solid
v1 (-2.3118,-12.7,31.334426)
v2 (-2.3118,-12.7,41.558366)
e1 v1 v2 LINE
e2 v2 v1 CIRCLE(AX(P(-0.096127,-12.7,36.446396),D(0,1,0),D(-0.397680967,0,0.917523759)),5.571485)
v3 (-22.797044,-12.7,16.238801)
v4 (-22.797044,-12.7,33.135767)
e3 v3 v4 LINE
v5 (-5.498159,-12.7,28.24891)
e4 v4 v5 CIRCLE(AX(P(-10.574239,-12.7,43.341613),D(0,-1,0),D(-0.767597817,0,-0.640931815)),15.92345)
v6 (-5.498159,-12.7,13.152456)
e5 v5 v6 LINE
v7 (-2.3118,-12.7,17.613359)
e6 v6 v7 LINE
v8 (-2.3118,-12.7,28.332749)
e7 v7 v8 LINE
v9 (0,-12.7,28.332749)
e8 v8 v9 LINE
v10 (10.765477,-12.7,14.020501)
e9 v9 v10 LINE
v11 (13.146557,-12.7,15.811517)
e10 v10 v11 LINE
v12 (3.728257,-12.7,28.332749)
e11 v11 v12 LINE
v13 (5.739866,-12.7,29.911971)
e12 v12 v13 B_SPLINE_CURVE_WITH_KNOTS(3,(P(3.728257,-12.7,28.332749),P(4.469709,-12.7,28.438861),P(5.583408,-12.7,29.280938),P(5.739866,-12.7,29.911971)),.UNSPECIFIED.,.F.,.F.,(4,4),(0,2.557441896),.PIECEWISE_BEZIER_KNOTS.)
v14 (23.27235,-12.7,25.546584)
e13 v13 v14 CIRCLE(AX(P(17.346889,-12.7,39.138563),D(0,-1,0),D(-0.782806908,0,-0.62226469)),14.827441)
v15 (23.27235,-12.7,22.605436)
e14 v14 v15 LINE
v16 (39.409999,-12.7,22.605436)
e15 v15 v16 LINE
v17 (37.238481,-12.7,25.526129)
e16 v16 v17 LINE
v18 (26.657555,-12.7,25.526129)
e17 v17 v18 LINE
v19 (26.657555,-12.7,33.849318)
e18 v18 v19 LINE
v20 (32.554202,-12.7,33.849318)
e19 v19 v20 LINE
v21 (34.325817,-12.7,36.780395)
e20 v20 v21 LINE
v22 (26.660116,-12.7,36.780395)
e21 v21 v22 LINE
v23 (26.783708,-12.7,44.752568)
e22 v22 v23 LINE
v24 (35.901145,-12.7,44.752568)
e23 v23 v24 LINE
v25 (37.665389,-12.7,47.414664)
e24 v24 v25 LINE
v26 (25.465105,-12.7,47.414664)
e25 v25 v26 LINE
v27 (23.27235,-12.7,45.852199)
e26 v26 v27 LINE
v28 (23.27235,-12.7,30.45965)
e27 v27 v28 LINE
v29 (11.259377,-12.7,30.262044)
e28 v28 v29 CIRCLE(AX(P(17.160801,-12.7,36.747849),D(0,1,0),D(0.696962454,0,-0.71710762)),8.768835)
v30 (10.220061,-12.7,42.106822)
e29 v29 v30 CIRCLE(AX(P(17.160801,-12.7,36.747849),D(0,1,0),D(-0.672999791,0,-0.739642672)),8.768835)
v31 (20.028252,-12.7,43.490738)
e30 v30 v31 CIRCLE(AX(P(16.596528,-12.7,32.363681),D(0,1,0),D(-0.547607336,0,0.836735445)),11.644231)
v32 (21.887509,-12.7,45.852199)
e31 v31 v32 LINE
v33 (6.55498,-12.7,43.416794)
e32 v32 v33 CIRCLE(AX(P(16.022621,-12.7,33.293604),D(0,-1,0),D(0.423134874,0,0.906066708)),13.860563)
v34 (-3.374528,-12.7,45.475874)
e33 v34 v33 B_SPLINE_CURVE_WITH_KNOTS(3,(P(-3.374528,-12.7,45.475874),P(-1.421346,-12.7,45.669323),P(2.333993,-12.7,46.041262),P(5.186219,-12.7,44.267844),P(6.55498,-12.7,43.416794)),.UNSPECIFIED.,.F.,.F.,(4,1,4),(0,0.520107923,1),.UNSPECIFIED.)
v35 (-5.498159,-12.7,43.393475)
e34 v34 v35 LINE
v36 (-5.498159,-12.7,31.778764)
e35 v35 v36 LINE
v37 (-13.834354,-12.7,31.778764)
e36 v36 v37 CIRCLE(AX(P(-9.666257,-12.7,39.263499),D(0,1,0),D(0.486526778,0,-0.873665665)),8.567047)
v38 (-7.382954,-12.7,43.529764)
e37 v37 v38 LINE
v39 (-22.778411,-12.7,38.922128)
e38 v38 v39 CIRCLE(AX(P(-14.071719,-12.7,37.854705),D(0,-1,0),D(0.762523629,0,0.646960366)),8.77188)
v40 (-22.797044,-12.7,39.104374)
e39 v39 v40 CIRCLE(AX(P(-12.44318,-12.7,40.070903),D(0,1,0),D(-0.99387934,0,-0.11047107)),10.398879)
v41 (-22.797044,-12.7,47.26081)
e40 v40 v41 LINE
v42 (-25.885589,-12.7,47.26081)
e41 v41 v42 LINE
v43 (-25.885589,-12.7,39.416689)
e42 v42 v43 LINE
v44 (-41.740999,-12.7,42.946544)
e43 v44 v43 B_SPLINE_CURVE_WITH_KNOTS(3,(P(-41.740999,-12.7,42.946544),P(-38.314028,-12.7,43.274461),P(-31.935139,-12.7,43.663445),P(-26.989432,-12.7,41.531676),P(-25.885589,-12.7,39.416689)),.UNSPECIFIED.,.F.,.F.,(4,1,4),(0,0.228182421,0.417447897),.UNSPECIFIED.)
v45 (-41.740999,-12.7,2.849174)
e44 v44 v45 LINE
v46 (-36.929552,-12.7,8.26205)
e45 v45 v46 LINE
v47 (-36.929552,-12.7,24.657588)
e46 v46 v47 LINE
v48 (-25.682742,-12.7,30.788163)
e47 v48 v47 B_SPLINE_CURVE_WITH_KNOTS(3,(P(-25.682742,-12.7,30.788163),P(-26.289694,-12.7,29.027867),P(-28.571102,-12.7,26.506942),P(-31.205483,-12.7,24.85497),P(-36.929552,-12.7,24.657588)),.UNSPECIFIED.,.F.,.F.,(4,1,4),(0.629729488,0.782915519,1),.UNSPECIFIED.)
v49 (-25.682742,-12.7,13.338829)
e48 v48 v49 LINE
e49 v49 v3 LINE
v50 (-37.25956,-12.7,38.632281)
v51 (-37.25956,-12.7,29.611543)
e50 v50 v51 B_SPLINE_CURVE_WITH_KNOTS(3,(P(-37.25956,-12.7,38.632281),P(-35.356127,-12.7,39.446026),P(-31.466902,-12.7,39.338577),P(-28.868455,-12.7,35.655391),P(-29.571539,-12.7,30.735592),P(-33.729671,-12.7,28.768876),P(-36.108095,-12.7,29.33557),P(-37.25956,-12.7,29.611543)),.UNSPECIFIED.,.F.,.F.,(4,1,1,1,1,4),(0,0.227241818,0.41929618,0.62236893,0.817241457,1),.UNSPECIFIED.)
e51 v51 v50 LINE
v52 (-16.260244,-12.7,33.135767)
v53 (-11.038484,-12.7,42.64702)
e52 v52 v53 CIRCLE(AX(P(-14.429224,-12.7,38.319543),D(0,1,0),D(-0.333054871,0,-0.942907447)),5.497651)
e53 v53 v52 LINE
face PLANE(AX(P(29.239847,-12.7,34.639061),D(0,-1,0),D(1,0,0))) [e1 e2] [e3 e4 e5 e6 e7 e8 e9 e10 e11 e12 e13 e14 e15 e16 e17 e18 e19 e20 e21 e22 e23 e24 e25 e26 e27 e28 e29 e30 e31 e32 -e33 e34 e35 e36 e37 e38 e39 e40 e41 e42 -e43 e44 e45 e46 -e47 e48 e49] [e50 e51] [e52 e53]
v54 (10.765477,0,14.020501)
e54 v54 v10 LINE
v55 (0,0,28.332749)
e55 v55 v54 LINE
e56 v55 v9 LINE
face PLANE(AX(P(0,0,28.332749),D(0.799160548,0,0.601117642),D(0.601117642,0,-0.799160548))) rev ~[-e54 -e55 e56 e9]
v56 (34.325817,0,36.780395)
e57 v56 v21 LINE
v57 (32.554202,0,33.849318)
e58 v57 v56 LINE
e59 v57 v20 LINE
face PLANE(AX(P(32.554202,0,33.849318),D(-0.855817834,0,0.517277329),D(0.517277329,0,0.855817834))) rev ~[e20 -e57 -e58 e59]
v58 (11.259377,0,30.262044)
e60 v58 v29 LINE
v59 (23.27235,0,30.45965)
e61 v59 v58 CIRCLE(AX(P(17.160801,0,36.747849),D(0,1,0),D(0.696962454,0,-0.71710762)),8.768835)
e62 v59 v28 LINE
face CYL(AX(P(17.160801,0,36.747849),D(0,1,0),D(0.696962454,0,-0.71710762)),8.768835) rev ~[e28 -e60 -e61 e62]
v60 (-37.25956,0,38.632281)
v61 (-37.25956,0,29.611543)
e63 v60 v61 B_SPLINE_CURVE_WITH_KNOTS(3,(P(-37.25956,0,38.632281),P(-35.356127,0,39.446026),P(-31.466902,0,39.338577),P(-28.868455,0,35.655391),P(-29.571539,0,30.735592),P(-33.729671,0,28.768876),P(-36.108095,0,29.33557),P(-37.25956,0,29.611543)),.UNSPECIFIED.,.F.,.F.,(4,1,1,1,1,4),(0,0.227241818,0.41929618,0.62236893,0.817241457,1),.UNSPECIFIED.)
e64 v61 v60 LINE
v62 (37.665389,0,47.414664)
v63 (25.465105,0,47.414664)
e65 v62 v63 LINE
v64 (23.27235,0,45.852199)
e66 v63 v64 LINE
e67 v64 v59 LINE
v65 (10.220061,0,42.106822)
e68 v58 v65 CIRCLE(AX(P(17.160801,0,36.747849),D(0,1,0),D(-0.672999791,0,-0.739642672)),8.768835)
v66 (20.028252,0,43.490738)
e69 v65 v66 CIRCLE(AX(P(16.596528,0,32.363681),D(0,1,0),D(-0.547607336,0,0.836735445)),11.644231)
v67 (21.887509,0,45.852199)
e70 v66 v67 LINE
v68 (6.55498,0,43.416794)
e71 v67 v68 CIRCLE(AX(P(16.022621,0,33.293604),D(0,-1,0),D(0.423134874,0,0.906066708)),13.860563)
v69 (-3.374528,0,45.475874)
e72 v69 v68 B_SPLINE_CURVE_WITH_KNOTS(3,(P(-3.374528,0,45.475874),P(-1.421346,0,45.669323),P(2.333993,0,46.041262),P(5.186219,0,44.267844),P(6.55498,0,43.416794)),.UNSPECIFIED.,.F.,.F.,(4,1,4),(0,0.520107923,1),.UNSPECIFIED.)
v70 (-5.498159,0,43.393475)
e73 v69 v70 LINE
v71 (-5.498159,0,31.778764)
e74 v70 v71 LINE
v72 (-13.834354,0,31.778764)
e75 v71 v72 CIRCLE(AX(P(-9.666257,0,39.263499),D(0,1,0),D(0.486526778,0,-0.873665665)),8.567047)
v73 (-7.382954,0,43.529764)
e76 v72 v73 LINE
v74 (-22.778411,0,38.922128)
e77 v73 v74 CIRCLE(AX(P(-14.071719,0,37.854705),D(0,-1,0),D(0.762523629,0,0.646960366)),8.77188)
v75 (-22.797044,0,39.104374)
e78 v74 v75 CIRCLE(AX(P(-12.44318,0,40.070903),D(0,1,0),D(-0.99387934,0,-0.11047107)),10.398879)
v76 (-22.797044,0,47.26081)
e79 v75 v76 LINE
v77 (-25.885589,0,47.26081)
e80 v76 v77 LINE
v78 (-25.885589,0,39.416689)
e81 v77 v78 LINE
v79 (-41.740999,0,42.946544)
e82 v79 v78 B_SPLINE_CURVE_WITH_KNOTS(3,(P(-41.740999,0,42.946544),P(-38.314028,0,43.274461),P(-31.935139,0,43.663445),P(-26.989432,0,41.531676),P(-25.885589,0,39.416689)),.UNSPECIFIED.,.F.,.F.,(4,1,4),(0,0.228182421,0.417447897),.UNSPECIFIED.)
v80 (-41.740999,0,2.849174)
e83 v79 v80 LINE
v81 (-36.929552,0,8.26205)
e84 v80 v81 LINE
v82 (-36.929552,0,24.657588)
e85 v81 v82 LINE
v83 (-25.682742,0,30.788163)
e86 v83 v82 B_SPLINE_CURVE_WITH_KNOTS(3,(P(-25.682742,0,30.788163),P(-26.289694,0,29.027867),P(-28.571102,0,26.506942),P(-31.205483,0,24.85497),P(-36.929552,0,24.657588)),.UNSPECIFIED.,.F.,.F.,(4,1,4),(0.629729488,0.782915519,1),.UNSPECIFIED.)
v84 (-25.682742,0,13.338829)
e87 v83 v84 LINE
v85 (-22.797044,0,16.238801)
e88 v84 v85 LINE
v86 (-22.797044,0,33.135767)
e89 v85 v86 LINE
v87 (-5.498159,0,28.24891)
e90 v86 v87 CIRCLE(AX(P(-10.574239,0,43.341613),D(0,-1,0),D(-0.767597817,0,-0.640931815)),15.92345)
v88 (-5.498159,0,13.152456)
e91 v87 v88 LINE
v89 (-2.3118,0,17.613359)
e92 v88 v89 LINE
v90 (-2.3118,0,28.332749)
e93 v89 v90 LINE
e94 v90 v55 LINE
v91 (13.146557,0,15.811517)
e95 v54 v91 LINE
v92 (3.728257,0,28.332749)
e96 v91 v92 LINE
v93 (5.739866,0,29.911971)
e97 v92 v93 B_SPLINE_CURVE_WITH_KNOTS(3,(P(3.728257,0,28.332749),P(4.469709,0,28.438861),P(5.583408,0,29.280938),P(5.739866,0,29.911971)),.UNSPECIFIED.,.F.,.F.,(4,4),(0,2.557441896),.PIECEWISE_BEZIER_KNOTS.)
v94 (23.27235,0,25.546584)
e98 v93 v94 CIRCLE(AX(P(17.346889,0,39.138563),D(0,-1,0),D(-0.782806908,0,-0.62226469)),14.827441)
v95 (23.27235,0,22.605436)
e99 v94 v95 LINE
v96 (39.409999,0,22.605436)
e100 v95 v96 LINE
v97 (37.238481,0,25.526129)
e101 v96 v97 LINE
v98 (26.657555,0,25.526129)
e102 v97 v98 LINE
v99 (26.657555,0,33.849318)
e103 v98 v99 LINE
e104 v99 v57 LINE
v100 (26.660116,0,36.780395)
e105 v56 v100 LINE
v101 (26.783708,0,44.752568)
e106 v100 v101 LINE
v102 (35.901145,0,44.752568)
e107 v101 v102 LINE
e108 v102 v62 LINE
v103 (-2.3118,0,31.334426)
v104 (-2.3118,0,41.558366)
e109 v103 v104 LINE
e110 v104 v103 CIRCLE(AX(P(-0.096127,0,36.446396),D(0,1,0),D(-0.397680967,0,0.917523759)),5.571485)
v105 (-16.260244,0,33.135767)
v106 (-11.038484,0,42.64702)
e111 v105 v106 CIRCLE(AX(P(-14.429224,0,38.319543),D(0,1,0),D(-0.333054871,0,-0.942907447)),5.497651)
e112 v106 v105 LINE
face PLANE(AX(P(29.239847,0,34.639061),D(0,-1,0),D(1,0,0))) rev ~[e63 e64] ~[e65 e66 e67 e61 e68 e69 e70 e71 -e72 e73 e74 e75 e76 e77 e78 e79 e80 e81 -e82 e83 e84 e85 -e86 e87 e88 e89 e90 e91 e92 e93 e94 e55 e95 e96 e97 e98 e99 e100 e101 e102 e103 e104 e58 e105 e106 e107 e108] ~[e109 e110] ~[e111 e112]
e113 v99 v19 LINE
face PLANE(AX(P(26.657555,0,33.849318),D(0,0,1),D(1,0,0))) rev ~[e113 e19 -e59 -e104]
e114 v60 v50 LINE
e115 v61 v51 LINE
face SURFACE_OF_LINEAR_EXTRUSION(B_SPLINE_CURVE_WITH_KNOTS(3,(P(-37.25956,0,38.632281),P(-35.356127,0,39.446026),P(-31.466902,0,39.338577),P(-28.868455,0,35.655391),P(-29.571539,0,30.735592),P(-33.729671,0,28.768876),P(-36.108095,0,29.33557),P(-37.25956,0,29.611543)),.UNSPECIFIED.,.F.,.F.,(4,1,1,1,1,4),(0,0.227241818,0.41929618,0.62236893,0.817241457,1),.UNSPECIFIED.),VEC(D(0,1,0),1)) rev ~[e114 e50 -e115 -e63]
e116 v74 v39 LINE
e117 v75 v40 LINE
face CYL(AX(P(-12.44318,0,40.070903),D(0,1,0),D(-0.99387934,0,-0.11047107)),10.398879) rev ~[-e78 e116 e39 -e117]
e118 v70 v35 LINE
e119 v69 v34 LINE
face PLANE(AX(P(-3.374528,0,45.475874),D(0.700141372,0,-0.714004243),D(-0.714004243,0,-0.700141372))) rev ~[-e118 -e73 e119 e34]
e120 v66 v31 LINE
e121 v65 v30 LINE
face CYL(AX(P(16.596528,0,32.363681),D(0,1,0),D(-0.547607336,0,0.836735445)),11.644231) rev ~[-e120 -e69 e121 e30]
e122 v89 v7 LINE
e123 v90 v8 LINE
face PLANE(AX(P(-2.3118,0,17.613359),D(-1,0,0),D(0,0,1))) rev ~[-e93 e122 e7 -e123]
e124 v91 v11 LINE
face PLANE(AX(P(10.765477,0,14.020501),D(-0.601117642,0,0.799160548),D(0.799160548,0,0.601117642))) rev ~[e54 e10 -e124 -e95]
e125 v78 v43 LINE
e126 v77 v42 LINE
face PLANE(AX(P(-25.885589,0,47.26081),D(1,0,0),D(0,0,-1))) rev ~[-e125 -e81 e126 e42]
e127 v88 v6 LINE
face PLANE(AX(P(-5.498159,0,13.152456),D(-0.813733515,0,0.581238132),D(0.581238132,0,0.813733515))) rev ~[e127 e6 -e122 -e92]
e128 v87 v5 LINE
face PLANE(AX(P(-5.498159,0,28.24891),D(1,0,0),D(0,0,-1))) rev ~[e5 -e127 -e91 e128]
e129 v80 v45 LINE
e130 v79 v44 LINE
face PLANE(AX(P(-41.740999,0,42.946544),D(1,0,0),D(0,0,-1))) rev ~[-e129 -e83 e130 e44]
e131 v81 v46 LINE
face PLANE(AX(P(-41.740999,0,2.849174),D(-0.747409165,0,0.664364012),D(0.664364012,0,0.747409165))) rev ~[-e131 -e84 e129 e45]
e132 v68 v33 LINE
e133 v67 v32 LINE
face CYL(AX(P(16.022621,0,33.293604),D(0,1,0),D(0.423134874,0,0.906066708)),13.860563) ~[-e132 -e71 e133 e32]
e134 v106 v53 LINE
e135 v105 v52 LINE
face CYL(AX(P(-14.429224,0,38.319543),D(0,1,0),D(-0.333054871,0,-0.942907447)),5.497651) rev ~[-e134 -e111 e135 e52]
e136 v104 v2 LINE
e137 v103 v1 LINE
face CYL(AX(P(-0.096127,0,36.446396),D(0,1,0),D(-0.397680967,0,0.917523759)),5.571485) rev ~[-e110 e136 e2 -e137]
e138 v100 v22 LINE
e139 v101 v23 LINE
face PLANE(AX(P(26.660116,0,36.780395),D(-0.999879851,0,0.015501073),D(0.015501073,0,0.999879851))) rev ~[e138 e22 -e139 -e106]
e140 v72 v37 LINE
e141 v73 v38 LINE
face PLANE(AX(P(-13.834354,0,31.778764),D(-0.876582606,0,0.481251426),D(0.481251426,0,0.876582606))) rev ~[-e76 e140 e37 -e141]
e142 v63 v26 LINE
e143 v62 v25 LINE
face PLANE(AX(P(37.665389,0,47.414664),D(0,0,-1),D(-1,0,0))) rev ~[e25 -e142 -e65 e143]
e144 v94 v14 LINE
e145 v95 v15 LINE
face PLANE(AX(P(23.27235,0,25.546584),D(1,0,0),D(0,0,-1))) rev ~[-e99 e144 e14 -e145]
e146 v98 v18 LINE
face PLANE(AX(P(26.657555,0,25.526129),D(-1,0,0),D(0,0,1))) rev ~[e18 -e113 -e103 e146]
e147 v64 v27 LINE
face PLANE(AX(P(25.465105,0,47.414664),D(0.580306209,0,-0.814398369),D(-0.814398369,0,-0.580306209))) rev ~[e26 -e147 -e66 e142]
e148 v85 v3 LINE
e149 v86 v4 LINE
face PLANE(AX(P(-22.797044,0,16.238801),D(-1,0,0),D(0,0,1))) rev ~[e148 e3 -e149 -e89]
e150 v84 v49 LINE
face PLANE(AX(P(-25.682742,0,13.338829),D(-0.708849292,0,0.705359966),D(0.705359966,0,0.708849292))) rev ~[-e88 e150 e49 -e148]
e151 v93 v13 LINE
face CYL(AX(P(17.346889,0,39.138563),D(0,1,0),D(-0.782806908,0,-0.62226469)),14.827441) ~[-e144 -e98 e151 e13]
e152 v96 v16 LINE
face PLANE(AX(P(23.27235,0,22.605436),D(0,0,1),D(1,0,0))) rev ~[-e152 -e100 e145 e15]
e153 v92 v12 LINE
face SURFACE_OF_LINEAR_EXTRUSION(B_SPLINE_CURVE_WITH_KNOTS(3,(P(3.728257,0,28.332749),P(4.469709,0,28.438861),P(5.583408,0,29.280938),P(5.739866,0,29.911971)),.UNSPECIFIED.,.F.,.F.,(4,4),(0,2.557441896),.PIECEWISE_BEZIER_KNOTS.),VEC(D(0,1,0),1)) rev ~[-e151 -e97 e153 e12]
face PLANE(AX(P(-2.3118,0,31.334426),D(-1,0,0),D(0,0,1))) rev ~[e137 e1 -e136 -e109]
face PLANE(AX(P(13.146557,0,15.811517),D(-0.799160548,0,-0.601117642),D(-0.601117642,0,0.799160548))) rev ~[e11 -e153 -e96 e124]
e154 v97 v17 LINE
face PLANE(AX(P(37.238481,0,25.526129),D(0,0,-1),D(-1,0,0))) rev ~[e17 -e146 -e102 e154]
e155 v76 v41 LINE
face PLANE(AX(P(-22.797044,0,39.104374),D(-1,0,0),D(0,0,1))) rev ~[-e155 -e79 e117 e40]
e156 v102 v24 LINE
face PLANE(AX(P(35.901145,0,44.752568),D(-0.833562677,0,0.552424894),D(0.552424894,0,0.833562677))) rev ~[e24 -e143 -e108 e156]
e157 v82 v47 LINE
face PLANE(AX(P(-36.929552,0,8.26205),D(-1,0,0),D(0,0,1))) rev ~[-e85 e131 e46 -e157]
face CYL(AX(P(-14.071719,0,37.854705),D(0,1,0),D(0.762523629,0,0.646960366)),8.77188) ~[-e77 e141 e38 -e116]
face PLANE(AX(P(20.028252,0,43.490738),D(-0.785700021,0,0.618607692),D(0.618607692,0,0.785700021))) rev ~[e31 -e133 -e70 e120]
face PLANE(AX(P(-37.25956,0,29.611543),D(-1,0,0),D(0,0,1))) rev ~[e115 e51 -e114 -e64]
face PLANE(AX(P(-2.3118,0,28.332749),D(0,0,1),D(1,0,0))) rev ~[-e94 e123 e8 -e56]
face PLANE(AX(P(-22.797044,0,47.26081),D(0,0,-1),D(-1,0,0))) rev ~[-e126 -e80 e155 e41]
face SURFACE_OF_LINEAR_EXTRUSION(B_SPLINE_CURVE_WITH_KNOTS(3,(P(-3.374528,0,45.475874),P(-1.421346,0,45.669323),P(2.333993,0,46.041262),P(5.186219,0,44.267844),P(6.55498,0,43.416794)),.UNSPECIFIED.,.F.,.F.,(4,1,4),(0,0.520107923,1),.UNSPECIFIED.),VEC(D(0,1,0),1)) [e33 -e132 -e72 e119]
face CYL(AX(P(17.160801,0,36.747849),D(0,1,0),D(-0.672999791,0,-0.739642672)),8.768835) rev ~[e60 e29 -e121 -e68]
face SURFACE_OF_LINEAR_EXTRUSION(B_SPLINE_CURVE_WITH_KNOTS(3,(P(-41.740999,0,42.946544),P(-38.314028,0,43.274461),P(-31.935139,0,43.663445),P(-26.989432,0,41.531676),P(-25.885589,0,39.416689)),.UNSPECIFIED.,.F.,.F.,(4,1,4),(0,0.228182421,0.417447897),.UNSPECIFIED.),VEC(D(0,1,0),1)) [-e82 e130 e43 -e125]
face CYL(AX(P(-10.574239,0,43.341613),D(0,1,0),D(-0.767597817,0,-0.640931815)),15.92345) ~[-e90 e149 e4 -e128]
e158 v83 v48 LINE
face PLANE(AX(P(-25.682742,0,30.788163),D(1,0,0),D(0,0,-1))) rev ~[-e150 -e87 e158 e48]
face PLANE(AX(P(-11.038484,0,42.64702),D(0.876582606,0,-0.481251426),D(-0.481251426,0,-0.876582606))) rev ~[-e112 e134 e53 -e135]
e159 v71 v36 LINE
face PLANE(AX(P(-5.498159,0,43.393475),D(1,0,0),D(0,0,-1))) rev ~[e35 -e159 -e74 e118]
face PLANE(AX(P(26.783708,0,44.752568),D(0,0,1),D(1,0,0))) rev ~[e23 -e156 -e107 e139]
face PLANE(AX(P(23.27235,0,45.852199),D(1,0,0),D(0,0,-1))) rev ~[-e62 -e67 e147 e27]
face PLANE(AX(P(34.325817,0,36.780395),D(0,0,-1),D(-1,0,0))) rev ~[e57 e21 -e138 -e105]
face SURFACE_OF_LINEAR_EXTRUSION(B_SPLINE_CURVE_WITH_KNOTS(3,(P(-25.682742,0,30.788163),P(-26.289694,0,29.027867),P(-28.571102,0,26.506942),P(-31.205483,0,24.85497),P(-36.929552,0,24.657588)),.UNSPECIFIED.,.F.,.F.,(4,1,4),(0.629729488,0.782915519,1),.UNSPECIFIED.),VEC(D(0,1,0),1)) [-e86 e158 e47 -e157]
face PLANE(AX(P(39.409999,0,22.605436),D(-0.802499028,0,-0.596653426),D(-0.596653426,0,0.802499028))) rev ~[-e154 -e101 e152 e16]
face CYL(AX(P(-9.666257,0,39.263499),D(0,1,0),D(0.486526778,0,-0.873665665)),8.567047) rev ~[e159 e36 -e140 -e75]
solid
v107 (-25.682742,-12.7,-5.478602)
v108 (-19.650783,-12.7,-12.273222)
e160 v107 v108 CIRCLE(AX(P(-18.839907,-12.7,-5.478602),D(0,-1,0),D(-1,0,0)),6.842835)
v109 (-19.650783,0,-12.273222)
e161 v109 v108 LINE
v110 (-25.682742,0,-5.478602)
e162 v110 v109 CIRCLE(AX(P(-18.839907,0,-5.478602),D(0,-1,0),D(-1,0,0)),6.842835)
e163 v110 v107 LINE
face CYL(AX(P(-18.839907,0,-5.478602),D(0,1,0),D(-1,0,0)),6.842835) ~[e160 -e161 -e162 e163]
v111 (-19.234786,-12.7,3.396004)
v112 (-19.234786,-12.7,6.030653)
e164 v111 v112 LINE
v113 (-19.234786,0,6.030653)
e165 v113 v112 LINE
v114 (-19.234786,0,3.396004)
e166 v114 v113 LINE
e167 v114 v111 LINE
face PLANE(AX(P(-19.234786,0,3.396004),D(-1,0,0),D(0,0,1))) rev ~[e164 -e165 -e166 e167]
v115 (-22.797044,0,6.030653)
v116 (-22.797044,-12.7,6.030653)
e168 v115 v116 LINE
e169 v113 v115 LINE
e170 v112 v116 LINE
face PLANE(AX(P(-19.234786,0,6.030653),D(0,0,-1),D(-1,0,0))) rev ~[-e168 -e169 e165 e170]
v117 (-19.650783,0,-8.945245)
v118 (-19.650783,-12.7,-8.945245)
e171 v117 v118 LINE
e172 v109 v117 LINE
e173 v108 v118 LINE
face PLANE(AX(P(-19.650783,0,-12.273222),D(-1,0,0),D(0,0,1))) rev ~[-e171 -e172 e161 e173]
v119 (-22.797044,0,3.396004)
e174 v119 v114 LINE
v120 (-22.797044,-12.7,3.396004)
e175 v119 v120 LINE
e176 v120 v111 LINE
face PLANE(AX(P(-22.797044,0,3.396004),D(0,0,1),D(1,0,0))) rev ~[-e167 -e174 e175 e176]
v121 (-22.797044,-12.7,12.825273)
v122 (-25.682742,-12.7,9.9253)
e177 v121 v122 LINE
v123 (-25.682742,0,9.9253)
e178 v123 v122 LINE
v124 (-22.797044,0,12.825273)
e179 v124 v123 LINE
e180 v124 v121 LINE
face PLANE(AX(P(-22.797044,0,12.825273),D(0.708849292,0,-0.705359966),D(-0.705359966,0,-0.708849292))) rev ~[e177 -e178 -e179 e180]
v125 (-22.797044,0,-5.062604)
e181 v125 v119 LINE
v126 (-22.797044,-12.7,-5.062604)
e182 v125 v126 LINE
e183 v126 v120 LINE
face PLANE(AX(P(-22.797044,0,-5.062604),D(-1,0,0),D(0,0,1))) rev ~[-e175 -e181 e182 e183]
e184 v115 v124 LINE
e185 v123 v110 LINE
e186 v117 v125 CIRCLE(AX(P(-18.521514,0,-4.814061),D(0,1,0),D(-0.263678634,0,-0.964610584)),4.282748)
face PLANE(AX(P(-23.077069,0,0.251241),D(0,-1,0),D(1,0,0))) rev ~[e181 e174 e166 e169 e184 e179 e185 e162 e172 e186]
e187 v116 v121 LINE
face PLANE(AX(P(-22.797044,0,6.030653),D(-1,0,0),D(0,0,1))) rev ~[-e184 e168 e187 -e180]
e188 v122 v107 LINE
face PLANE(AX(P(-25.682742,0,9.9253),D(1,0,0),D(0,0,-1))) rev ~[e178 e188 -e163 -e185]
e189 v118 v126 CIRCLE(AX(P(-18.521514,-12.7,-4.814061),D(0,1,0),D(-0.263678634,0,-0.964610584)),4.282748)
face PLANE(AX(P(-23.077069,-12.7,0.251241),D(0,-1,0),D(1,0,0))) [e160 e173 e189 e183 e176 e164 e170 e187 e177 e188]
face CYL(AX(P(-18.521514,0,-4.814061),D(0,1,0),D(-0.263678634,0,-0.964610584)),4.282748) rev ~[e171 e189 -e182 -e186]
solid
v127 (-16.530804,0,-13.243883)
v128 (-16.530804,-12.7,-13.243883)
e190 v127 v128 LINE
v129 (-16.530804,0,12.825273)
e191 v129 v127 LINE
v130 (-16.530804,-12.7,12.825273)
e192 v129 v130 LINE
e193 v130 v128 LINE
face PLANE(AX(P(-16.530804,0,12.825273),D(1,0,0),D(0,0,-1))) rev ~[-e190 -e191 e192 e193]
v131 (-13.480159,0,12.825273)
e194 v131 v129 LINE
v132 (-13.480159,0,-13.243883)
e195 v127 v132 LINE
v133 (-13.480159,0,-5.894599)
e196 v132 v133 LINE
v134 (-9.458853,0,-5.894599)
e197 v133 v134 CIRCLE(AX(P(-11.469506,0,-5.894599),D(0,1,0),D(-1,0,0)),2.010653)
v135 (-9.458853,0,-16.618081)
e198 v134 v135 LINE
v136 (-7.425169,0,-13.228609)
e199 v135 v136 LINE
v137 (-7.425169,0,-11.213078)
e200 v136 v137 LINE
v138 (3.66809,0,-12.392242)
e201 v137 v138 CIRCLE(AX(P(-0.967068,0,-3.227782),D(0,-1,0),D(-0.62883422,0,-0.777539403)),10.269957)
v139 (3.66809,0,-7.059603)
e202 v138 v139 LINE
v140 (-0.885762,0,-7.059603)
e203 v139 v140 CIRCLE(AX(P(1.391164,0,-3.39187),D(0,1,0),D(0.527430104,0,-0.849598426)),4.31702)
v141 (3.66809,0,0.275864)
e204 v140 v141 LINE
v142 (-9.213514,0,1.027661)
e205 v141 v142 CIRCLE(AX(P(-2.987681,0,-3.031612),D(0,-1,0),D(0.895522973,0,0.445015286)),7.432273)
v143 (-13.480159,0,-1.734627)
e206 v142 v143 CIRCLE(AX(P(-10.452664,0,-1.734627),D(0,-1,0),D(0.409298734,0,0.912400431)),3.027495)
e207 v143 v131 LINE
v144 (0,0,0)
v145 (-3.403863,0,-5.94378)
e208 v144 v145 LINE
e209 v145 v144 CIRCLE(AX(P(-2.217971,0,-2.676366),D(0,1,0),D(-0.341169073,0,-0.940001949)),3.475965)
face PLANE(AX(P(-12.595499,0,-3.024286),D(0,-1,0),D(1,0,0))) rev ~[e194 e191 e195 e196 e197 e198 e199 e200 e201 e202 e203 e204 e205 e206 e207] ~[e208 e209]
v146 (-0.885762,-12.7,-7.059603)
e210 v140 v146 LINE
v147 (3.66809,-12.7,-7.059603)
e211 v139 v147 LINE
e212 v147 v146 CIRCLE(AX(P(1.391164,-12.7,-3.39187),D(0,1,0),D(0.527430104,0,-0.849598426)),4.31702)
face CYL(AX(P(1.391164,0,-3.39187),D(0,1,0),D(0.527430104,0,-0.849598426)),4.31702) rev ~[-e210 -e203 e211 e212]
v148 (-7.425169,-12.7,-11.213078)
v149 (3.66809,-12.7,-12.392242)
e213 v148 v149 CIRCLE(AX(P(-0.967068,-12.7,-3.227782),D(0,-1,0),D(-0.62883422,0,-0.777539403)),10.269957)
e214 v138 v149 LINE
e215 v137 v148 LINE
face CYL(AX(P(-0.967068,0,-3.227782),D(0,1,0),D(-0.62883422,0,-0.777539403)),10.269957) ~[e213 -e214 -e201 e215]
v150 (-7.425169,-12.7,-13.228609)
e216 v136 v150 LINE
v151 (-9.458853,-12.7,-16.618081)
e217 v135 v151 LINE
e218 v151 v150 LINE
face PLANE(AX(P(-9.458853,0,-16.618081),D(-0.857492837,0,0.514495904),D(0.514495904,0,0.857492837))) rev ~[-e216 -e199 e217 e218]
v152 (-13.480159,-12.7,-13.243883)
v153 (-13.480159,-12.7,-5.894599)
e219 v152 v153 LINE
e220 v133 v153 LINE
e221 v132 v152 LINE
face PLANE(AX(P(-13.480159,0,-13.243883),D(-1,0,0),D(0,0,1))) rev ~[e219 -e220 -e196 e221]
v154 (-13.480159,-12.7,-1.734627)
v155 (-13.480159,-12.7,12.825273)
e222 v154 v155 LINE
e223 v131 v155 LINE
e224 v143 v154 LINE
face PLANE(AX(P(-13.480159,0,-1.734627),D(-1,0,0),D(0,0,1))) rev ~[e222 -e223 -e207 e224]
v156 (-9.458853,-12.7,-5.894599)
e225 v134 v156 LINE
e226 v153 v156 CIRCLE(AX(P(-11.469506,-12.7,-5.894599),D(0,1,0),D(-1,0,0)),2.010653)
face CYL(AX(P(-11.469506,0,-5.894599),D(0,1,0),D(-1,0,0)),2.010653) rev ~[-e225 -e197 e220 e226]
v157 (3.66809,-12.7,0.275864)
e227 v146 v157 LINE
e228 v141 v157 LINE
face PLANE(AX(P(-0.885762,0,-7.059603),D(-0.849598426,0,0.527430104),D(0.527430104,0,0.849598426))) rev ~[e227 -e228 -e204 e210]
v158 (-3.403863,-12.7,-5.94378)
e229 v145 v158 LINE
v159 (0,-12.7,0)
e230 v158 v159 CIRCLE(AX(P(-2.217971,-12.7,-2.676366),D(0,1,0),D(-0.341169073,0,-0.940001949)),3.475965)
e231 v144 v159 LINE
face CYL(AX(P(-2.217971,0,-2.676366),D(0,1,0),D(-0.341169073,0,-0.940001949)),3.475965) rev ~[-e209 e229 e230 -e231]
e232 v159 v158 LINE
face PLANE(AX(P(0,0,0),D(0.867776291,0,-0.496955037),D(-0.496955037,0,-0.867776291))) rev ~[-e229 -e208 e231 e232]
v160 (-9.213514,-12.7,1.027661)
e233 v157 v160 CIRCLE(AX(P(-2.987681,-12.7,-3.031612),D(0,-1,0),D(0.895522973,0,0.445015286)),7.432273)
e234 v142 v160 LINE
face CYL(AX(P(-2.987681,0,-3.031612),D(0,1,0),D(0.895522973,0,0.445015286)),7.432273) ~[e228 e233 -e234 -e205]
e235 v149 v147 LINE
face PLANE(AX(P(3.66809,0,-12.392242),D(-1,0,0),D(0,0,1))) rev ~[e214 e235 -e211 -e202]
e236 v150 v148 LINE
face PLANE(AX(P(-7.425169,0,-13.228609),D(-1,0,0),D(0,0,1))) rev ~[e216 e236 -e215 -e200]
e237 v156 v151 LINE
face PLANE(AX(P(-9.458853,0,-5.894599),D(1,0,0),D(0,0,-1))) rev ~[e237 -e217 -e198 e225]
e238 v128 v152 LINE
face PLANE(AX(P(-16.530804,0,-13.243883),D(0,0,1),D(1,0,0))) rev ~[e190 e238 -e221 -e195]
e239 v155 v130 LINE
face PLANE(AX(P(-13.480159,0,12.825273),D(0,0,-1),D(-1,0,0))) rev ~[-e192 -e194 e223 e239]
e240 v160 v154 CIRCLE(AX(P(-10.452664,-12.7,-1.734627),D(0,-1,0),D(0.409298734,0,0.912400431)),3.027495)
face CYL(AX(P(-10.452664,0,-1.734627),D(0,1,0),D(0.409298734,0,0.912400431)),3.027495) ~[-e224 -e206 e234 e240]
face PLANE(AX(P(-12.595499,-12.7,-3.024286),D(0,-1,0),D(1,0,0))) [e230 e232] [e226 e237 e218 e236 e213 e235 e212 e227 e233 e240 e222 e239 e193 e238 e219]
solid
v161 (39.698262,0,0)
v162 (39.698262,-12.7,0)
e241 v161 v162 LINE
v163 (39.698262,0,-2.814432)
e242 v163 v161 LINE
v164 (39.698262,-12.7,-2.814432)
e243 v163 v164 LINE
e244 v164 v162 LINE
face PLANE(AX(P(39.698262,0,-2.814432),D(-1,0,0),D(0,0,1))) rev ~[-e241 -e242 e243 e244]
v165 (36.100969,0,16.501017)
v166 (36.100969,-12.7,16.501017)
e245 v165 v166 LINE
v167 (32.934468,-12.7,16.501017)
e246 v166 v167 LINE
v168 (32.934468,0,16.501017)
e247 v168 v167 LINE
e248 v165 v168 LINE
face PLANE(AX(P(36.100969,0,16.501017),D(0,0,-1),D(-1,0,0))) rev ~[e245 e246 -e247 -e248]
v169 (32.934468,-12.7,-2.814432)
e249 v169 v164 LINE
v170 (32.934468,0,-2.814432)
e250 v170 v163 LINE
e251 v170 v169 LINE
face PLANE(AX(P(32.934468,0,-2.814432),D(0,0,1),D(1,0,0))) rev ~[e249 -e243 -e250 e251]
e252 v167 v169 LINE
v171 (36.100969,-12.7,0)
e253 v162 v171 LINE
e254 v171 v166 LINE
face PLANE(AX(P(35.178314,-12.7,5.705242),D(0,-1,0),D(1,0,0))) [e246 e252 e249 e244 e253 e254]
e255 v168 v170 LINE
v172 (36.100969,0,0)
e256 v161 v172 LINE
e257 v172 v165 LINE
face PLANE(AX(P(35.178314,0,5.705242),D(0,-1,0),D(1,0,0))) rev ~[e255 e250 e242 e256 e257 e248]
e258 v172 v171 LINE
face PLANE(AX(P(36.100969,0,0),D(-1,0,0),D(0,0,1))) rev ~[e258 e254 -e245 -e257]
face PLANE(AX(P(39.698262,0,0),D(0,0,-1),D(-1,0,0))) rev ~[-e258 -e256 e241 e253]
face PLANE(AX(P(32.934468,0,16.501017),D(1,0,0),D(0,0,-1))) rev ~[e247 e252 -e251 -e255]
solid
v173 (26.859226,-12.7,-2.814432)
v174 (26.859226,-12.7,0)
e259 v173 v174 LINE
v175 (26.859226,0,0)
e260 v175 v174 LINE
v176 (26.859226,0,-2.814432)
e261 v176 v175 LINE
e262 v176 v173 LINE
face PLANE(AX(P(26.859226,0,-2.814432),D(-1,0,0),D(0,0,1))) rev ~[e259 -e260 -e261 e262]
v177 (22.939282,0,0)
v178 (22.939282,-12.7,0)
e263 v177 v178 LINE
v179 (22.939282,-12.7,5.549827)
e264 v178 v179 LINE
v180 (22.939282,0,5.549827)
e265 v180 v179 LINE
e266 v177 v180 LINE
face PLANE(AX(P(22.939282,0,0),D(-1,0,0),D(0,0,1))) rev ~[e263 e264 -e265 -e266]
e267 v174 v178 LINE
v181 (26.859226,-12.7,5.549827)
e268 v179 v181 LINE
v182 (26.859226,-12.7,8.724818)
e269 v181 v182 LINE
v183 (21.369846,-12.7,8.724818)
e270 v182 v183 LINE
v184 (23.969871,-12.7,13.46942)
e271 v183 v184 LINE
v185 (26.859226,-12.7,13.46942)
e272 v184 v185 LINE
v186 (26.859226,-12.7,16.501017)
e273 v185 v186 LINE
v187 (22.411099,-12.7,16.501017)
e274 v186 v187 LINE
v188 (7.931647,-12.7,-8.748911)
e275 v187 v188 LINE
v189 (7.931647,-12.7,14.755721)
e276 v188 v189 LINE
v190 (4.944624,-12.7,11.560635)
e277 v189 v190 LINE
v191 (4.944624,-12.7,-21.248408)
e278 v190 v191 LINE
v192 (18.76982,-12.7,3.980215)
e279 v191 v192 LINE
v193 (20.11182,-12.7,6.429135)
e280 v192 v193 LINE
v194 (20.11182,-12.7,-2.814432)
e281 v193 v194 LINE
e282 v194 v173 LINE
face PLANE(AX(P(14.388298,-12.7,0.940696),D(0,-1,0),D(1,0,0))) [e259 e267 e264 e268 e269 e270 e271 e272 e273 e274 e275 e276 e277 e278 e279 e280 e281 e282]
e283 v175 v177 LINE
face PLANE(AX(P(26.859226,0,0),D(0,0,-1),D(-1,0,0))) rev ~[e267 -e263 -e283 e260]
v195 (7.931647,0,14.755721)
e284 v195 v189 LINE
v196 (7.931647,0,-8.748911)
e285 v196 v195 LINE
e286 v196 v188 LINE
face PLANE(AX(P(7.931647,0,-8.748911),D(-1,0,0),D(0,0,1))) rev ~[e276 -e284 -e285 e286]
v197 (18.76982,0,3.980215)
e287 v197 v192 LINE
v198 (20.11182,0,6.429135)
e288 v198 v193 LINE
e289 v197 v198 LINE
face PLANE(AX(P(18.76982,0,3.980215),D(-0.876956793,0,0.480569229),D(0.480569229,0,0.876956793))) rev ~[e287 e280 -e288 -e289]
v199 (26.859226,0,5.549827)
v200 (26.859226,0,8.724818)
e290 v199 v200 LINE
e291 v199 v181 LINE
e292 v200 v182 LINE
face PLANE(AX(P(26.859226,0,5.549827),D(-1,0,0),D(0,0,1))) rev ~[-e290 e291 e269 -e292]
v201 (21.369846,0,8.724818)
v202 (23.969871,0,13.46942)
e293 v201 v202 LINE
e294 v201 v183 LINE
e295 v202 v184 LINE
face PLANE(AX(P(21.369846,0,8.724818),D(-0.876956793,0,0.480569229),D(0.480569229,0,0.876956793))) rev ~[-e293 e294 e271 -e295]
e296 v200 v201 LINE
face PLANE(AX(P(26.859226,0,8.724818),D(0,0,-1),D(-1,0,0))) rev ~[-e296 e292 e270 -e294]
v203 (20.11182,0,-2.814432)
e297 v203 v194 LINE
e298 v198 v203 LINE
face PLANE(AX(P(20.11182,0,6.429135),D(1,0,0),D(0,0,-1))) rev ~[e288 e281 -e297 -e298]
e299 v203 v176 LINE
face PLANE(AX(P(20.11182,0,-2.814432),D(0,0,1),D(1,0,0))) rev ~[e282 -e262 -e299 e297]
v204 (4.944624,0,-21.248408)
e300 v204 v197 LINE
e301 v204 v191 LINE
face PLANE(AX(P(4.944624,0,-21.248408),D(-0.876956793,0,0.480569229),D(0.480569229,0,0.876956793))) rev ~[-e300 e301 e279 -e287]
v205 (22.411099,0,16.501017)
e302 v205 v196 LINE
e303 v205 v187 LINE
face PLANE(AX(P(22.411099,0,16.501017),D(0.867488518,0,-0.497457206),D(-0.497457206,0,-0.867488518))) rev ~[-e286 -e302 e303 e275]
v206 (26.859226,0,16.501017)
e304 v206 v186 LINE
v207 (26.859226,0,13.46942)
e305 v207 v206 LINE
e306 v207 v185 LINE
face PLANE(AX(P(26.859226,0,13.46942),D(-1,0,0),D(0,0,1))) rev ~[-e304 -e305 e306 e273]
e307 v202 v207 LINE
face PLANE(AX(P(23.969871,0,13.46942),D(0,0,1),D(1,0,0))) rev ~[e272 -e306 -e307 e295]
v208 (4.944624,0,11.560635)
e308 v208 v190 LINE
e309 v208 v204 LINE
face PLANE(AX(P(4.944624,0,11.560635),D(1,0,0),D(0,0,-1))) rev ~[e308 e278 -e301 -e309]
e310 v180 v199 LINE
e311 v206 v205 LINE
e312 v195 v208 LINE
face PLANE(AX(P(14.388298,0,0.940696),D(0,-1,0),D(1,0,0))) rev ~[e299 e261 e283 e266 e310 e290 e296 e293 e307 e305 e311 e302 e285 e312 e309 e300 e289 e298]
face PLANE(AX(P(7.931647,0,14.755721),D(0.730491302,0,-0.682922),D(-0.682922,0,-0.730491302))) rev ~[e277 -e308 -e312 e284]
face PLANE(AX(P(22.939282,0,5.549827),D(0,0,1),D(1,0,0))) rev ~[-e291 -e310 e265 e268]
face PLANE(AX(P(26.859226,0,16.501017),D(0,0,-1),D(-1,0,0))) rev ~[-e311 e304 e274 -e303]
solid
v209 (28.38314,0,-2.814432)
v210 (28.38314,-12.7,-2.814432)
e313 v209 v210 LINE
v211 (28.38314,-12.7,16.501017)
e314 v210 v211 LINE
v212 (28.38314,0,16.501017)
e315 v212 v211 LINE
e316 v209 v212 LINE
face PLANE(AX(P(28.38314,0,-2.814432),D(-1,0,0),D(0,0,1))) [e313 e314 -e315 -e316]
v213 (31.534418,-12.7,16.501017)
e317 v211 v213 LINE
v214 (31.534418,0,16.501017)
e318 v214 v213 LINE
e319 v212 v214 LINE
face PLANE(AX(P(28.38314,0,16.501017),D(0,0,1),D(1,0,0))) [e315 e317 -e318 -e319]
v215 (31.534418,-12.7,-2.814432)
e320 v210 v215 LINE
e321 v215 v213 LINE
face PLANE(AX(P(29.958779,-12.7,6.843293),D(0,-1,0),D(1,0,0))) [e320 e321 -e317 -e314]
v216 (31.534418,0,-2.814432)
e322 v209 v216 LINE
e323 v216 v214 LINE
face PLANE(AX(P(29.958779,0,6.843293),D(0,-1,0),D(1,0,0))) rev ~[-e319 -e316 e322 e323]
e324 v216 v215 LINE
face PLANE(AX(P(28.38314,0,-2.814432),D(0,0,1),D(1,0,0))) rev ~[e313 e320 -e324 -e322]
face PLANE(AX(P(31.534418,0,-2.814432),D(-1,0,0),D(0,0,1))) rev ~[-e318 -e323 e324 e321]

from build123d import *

# Parameters (mm, degrees)
F1_DEPTH = 12.7
F0_W     = 3.1512789428
F0_H     = 19.3154485896


# Not quite as in the source:
# - a feature names something its author has since deleted; it is built from what else it names


with BuildPart() as f1:
    # F0 (on Front) → F1 (new body)
    with BuildSketch(Plane.XZ):
        with BuildLine():
            Line((-22.7970443666, 6.0306531377), (-22.7970443666, 12.8252729774))
            Line((-22.7970443666, 12.8252729774), (-25.6827417761, 9.9253003924))
            Line((-25.6827417761, 9.9253003924), (-25.6827417761, -5.4786019027))
            ThreePointArc((-25.6827417761, -5.4786019027), (-23.9571856116, -10.0214915962), (-19.6507833898, -12.273222208))
            Line((-19.6507833898, -12.273222208), (-19.6507833898, -8.9452452958))
            ThreePointArc((-19.6507833898, -8.9452452958), (-21.848929, -7.5103998354), (-22.7970443666, -5.062604323))
            Line((-22.7970443666, -5.062604323), (-22.7970443666, 3.3960044384))
            Line((-22.7970443666, 3.3960044384), (-19.2347858101, 3.3960044384))
            Line((-19.2347858101, 3.3960044384), (-19.2347858101, 6.0306531377))
            Line((-19.2347858101, 6.0306531377), (-22.7970443666, 6.0306531377))
        make_face()
    extrude(amount=F1_DEPTH)


with BuildPart() as f1b:
    # F0 (on Front) → F1, piece 2 (new body)
    with BuildSketch(Plane.XZ):
        with Locations((29.9587789923, 6.84329262)):
            Rectangle(F0_W, F0_H)
    extrude(amount=F1_DEPTH)


with BuildPart() as f1c:
    # F0 (on Front) → F1, piece 3 (new body)
    with BuildSketch(Plane.XZ):
        Polygon((36.1009687185, 16.5010169148), (32.9344682395, 16.5010169148), (32.9344682395, -2.8144316748), (39.6982617676, -2.8144316748), (39.6982617676, 0), (36.1009687185, 0), align=None)
    extrude(amount=F1_DEPTH)


with BuildPart() as f1d:
    # F0 (on Front) → F1, piece 4 (new body)
    with BuildSketch(Plane.XZ):
        Polygon((23.2723504305, 45.8521991968), (23.2723504305, 30.4596498609), (23.2723504305, 25.5465842783), (23.2723504305, 22.6054359227), (39.4099989739, 22.6054359227), (37.2384806324, 25.5261287093), (26.6575552523, 25.5261287093), (26.6575552523, 33.8493175805), (32.5542018329, 33.8493175805), (34.3258168194, 36.7803946137), (26.6601163894, 36.7803946137), (26.783708483, 44.7525680065), (35.9011446557, 44.7525680065), (37.6653889506, 47.4146641791), (25.4651047289, 47.4146641791), align=None)
        with BuildLine():
            ThreePointArc((-22.7784111307, 38.9221281908), (-22.7881290805, 39.0132098974), (-22.7970443666, 39.1043736704))
            Line((-22.7970443666, 39.1043736704), (-22.7970443666, 38.7572443403))
            ThreePointArc((-22.7970443666, 38.7572443403), (-22.7881176358, 38.839730326), (-22.7784111307, 38.9221281908))
        make_face()
        with BuildLine():
            Line((-25.8855894208, 47.2608096898), (-25.8855894208, 39.4166894257))
            add(Edge.make_bspline(
                [(-25.8855894208, 39.4166894257), (-24.6475112984, 37.0445040507), (-24.8416415293, 33.227538681), (-25.6827417761, 30.7881627232)],
                knots=[0.4174478971, 0.4174478971, 0.4174478971, 0.4174478971, 0.6297294882, 0.6297294882, 0.6297294882, 0.6297294882], degree=3))
            Line((-25.6827417761, 30.7881627232), (-25.6827417761, 13.3388286385))
            Line((-25.6827417761, 13.3388286385), (-22.7970443666, 16.2388012235))
            Line((-22.7970443666, 16.2388012235), (-22.7970443666, 33.1357669485))
            Line((-22.7970443666, 33.1357669485), (-22.7970443666, 38.7572443403))
            Line((-22.7970443666, 38.7572443403), (-22.7970443666, 39.1043736704))
            Line((-22.7970443666, 39.1043736704), (-22.7970443666, 47.2608096898))
            Line((-22.7970443666, 47.2608096898), (-25.8855894208, 47.2608096898))
        make_face()
        with BuildLine():
            Line((-5.4981587455, 31.7787639797), (-5.4981587455, 28.2489098608))
            Line((-5.4981587455, 28.2489098608), (-5.4981587455, 13.1524559511))
            Line((-5.4981587455, 13.1524559511), (-2.3118001409, 17.6133587109))
            Line((-2.3118001409, 17.6133587109), (-2.3118001409, 28.3327493817))
            Line((-2.3118001409, 28.3327493817), (0, 28.3327493817))
            Line((0, 28.3327493817), (10.7654773061, 14.0205014217))
            Line((10.7654773061, 14.0205014217), (13.1465570685, 15.8115170761))
            Line((13.1465570685, 15.8115170761), (3.7282572594, 28.3327493817))
            add(Edge.make_bspline(
                [(3.7282572594, 28.3327493817), (4.4697086138, 28.4388605505), (5.583407823, 29.2809382081), (5.7398658246, 29.9119707197)],
                knots=[0, 0, 0, 0, 2.5574418965, 2.5574418965, 2.5574418965, 2.5574418965], degree=3))
            ThreePointArc((5.7398658246, 29.9119707197), (13.7644057738, 24.750415198), (23.2723504305, 25.5465842783))
            Line((23.2723504305, 25.5465842783), (23.2723504305, 30.4596498609))
            ThreePointArc((23.2723504305, 30.4596498609), (17.3050239314, 27.9801992486), (11.2593770027, 30.2620436996))
            ThreePointArc((11.2593770027, 30.2620436996), (8.4255284864, 35.9813750755), (10.2200610563, 42.1068221331))
            ThreePointArc((10.2200610563, 42.1068221331), (14.969664999, 43.8937045235), (20.0282521546, 43.4907376766))
            Line((20.0282521546, 43.4907376766), (21.8875091523, 45.8521991968))
            ThreePointArc((21.8875091523, 45.8521991968), (13.848280603, 46.9825580852), (6.554979831, 43.4167943895))
            add(Edge.make_bspline(
                [(-3.3745283409, 45.4758740962), (-1.4213463889, 45.669322552), (2.3339933507, 46.0412616194), (5.1862192298, 44.2678436312), (6.554979831, 43.4167943895)],
                knots=[0, 0, 0, 0, 0.520107923, 1, 1, 1, 1], degree=3))
            Line((-3.3745283409, 45.4758740962), (-5.4981587455, 43.3934754007))
            Line((-5.4981587455, 43.3934754007), (-5.4981587455, 31.7787639797))
        make_face()
        with BuildLine():
            Line((-2.3118001409, 31.334426254), (-2.3118001409, 41.5583662689))
            ThreePointArc((-2.3118001409, 41.5583662689), (5.4753586279, 36.4463962615), (-2.3118001409, 31.334426254))
        make_face(mode=Mode.SUBTRACT)
        with BuildLine():
            Line((-22.7970443666, 38.7572443403), (-22.7970443666, 33.1357669485))
            ThreePointArc((-22.7970443666, 33.1357669485), (-14.9031259742, 28.0178729436), (-5.4981587455, 28.2489098608))
            Line((-5.4981587455, 28.2489098608), (-5.4981587455, 31.7787639797))
            ThreePointArc((-5.4981587455, 31.7787639797), (-9.6662566066, 30.6964517708), (-13.8343544677, 31.7787639797))
            Line((-13.8343544677, 31.7787639797), (-7.3829540052, 43.5297638178))
            ThreePointArc((-7.3829540052, 43.5297638178), (-16.5867906437, 46.2582932174), (-22.7784111307, 38.9221281908))
            ThreePointArc((-22.7784111307, 38.9221281908), (-22.7881176358, 38.839730326), (-22.7970443666, 38.7572443403))
        make_face()
        with BuildLine():
            ThreePointArc((-16.2602435866, 33.1357669485), (-19.2483695666, 40.9652958819), (-11.0384837145, 42.6470195468))
            Line((-11.0384837145, 42.6470195468), (-16.2602435866, 33.1357669485))
        make_face(mode=Mode.SUBTRACT)
        with BuildLine():
            add(Edge.make_bspline(
                [(-41.7409986258, 42.9465435445), (-38.3140280434, 43.2744605369), (-31.9351392412, 43.6634452288), (-26.9894319336, 41.5316763702), (-25.8855894208, 39.4166894257)],
                knots=[0, 0, 0, 0, 0.2281824212, 0.4174478971, 0.4174478971, 0.4174478971, 0.4174478971], degree=3))
            Line((-41.7409986258, 42.9465435445), (-41.7409986258, 2.8491741978))
            Line((-41.7409986258, 2.8491741978), (-36.929551512, 8.2620496761))
            Line((-36.929551512, 8.2620496761), (-36.929551512, 24.6575884521))
            add(Edge.make_bspline(
                [(-25.6827417761, 30.7881627232), (-26.2896941154, 29.0278672654), (-28.5711016827, 26.5069421654), (-31.2054829086, 24.8549701927), (-36.929551512, 24.6575884521)],
                knots=[0.6297294882, 0.6297294882, 0.6297294882, 0.6297294882, 0.782915519, 1, 1, 1, 1], degree=3))
            add(Edge.make_bspline(
                [(-25.8855894208, 39.4166894257), (-24.6475112984, 37.0445040507), (-24.8416415293, 33.227538681), (-25.6827417761, 30.7881627232)],
                knots=[0.4174478971, 0.4174478971, 0.4174478971, 0.4174478971, 0.6297294882, 0.6297294882, 0.6297294882, 0.6297294882], degree=3))
        make_face()
        with BuildLine():
            Line((-37.2595600784, 29.6115428209), (-37.2595600784, 38.6322811246))
            add(Edge.make_bspline(
                [(-37.2595600784, 38.6322811246), (-35.3561267257, 39.4460260868), (-31.466902181, 39.3385766394), (-28.8684550726, 35.6553912172), (-29.5715392632, 30.735591869), (-33.7296713515, 28.7688764356), (-36.1080948778, 29.3355701334), (-37.2595600784, 29.6115428209)],
                knots=[0, 0, 0, 0, 0.2272418181, 0.4192961801, 0.62236893, 0.8172414567, 1, 1, 1, 1], degree=3))
        make_face(mode=Mode.SUBTRACT)
    extrude(amount=F1_DEPTH)


with BuildPart() as f1e:
    # F0 (on Front) → F1, piece 5 (new body)
    with BuildSketch(Plane.XZ):
        with BuildLine():
            Line((-16.5308043361, 12.8252729774), (-16.5308043361, 6.0306531377))
            Line((-16.5308043361, 6.0306531377), (-16.5308043361, -13.2438829169))
            Line((-16.5308043361, -13.2438829169), (-13.480159454, -13.2438829169))
            Line((-13.480159454, -13.2438829169), (-13.480159454, -5.8945985511))
            ThreePointArc((-13.480159454, -5.8945985511), (-11.469506193, -3.88394529), (-9.4588529319, -5.8945985511))
            Line((-9.4588529319, -5.8945985511), (-9.4588529319, -16.6180811874))
            Line((-9.4588529319, -16.6180811874), (-7.4251685292, -13.2286085109))
            Line((-7.4251685292, -13.2286085109), (-7.4251685292, -11.2130781636))
            Line((-7.4251685292, -11.2130781636), (-7.4251685292, -1.7346271779))
            ThreePointArc((-7.4251685292, -1.7346271779), (-7.9112814974, -0.0892993099), (-9.2135139302, 1.027660986))
            ThreePointArc((-9.2135139302, 1.027660986), (-12.0979918597, 0.8067553162), (-13.480159454, -1.7346271779))
            Line((-13.480159454, -1.7346271779), (-13.480159454, 12.8252729774))
            Line((-13.480159454, 12.8252729774), (-16.5308043361, 12.8252729774))
        make_face()
        with BuildLine():
            ThreePointArc((3.6680903286, 0.2758637036), (-2.5546550581, 4.3880363795), (-9.2135139302, 1.027660986))
            ThreePointArc((-9.2135139302, 1.027660986), (-7.9112814974, -0.0892993099), (-7.4251685292, -1.7346271779))
            Line((-7.4251685292, -1.7346271779), (-7.4251685292, -11.2130781636))
            ThreePointArc((-7.4251685292, -11.2130781636), (-2.0526030127, -13.4402072341), (3.6680903286, -12.3922416719))
            Line((3.6680903286, -12.3922416719), (3.6680903286, -7.0596027459))
            ThreePointArc((3.6680903286, -7.0596027459), (1.3911641285, -7.7088893182), (-0.8857620715, -7.0596027459))
            Line((-0.8857620715, -7.0596027459), (3.6680903286, 0.2758637036))
        make_face()
        with BuildLine():
            Line((0, 0), (-3.4038629383, -5.9437802993))
            ThreePointArc((-3.4038629383, -5.9437802993), (-5.2343312263, -0.9489680342), (0, 0))
        make_face(mode=Mode.SUBTRACT)
    extrude(amount=F1_DEPTH)


with BuildPart() as f1f:
    # F0 (on Front) → F1, piece 6 (new body)
    with BuildSketch(Plane.XZ):
        Polygon((26.8592257053, 16.5010169148), (22.4110993379, 16.5010169148), (7.9316468909, -8.7489113212), (7.9316468909, 14.7557211396), (4.9446239136, 11.5606354574), (4.9446239136, -21.2484076619), (18.7698199886, 3.9802147076), (20.1118197292, 6.4291351057), (20.1118197292, -2.8144316748), (26.8592257053, -2.8144316748), (26.8592257053, 0), (22.9392815381, 0), (22.9392815381, 5.5498266593), (26.8592257053, 5.5498266593), (26.8592257053, 8.7248175405), (21.3698456064, 8.7248175405), (23.9698712242, 13.4694203734), (26.8592257053, 13.4694203734), align=None)
    extrude(amount=F1_DEPTH)


solid = Compound([f1.part, f1b.part, f1c.part, f1d.part, f1e.part, f1f.part])
